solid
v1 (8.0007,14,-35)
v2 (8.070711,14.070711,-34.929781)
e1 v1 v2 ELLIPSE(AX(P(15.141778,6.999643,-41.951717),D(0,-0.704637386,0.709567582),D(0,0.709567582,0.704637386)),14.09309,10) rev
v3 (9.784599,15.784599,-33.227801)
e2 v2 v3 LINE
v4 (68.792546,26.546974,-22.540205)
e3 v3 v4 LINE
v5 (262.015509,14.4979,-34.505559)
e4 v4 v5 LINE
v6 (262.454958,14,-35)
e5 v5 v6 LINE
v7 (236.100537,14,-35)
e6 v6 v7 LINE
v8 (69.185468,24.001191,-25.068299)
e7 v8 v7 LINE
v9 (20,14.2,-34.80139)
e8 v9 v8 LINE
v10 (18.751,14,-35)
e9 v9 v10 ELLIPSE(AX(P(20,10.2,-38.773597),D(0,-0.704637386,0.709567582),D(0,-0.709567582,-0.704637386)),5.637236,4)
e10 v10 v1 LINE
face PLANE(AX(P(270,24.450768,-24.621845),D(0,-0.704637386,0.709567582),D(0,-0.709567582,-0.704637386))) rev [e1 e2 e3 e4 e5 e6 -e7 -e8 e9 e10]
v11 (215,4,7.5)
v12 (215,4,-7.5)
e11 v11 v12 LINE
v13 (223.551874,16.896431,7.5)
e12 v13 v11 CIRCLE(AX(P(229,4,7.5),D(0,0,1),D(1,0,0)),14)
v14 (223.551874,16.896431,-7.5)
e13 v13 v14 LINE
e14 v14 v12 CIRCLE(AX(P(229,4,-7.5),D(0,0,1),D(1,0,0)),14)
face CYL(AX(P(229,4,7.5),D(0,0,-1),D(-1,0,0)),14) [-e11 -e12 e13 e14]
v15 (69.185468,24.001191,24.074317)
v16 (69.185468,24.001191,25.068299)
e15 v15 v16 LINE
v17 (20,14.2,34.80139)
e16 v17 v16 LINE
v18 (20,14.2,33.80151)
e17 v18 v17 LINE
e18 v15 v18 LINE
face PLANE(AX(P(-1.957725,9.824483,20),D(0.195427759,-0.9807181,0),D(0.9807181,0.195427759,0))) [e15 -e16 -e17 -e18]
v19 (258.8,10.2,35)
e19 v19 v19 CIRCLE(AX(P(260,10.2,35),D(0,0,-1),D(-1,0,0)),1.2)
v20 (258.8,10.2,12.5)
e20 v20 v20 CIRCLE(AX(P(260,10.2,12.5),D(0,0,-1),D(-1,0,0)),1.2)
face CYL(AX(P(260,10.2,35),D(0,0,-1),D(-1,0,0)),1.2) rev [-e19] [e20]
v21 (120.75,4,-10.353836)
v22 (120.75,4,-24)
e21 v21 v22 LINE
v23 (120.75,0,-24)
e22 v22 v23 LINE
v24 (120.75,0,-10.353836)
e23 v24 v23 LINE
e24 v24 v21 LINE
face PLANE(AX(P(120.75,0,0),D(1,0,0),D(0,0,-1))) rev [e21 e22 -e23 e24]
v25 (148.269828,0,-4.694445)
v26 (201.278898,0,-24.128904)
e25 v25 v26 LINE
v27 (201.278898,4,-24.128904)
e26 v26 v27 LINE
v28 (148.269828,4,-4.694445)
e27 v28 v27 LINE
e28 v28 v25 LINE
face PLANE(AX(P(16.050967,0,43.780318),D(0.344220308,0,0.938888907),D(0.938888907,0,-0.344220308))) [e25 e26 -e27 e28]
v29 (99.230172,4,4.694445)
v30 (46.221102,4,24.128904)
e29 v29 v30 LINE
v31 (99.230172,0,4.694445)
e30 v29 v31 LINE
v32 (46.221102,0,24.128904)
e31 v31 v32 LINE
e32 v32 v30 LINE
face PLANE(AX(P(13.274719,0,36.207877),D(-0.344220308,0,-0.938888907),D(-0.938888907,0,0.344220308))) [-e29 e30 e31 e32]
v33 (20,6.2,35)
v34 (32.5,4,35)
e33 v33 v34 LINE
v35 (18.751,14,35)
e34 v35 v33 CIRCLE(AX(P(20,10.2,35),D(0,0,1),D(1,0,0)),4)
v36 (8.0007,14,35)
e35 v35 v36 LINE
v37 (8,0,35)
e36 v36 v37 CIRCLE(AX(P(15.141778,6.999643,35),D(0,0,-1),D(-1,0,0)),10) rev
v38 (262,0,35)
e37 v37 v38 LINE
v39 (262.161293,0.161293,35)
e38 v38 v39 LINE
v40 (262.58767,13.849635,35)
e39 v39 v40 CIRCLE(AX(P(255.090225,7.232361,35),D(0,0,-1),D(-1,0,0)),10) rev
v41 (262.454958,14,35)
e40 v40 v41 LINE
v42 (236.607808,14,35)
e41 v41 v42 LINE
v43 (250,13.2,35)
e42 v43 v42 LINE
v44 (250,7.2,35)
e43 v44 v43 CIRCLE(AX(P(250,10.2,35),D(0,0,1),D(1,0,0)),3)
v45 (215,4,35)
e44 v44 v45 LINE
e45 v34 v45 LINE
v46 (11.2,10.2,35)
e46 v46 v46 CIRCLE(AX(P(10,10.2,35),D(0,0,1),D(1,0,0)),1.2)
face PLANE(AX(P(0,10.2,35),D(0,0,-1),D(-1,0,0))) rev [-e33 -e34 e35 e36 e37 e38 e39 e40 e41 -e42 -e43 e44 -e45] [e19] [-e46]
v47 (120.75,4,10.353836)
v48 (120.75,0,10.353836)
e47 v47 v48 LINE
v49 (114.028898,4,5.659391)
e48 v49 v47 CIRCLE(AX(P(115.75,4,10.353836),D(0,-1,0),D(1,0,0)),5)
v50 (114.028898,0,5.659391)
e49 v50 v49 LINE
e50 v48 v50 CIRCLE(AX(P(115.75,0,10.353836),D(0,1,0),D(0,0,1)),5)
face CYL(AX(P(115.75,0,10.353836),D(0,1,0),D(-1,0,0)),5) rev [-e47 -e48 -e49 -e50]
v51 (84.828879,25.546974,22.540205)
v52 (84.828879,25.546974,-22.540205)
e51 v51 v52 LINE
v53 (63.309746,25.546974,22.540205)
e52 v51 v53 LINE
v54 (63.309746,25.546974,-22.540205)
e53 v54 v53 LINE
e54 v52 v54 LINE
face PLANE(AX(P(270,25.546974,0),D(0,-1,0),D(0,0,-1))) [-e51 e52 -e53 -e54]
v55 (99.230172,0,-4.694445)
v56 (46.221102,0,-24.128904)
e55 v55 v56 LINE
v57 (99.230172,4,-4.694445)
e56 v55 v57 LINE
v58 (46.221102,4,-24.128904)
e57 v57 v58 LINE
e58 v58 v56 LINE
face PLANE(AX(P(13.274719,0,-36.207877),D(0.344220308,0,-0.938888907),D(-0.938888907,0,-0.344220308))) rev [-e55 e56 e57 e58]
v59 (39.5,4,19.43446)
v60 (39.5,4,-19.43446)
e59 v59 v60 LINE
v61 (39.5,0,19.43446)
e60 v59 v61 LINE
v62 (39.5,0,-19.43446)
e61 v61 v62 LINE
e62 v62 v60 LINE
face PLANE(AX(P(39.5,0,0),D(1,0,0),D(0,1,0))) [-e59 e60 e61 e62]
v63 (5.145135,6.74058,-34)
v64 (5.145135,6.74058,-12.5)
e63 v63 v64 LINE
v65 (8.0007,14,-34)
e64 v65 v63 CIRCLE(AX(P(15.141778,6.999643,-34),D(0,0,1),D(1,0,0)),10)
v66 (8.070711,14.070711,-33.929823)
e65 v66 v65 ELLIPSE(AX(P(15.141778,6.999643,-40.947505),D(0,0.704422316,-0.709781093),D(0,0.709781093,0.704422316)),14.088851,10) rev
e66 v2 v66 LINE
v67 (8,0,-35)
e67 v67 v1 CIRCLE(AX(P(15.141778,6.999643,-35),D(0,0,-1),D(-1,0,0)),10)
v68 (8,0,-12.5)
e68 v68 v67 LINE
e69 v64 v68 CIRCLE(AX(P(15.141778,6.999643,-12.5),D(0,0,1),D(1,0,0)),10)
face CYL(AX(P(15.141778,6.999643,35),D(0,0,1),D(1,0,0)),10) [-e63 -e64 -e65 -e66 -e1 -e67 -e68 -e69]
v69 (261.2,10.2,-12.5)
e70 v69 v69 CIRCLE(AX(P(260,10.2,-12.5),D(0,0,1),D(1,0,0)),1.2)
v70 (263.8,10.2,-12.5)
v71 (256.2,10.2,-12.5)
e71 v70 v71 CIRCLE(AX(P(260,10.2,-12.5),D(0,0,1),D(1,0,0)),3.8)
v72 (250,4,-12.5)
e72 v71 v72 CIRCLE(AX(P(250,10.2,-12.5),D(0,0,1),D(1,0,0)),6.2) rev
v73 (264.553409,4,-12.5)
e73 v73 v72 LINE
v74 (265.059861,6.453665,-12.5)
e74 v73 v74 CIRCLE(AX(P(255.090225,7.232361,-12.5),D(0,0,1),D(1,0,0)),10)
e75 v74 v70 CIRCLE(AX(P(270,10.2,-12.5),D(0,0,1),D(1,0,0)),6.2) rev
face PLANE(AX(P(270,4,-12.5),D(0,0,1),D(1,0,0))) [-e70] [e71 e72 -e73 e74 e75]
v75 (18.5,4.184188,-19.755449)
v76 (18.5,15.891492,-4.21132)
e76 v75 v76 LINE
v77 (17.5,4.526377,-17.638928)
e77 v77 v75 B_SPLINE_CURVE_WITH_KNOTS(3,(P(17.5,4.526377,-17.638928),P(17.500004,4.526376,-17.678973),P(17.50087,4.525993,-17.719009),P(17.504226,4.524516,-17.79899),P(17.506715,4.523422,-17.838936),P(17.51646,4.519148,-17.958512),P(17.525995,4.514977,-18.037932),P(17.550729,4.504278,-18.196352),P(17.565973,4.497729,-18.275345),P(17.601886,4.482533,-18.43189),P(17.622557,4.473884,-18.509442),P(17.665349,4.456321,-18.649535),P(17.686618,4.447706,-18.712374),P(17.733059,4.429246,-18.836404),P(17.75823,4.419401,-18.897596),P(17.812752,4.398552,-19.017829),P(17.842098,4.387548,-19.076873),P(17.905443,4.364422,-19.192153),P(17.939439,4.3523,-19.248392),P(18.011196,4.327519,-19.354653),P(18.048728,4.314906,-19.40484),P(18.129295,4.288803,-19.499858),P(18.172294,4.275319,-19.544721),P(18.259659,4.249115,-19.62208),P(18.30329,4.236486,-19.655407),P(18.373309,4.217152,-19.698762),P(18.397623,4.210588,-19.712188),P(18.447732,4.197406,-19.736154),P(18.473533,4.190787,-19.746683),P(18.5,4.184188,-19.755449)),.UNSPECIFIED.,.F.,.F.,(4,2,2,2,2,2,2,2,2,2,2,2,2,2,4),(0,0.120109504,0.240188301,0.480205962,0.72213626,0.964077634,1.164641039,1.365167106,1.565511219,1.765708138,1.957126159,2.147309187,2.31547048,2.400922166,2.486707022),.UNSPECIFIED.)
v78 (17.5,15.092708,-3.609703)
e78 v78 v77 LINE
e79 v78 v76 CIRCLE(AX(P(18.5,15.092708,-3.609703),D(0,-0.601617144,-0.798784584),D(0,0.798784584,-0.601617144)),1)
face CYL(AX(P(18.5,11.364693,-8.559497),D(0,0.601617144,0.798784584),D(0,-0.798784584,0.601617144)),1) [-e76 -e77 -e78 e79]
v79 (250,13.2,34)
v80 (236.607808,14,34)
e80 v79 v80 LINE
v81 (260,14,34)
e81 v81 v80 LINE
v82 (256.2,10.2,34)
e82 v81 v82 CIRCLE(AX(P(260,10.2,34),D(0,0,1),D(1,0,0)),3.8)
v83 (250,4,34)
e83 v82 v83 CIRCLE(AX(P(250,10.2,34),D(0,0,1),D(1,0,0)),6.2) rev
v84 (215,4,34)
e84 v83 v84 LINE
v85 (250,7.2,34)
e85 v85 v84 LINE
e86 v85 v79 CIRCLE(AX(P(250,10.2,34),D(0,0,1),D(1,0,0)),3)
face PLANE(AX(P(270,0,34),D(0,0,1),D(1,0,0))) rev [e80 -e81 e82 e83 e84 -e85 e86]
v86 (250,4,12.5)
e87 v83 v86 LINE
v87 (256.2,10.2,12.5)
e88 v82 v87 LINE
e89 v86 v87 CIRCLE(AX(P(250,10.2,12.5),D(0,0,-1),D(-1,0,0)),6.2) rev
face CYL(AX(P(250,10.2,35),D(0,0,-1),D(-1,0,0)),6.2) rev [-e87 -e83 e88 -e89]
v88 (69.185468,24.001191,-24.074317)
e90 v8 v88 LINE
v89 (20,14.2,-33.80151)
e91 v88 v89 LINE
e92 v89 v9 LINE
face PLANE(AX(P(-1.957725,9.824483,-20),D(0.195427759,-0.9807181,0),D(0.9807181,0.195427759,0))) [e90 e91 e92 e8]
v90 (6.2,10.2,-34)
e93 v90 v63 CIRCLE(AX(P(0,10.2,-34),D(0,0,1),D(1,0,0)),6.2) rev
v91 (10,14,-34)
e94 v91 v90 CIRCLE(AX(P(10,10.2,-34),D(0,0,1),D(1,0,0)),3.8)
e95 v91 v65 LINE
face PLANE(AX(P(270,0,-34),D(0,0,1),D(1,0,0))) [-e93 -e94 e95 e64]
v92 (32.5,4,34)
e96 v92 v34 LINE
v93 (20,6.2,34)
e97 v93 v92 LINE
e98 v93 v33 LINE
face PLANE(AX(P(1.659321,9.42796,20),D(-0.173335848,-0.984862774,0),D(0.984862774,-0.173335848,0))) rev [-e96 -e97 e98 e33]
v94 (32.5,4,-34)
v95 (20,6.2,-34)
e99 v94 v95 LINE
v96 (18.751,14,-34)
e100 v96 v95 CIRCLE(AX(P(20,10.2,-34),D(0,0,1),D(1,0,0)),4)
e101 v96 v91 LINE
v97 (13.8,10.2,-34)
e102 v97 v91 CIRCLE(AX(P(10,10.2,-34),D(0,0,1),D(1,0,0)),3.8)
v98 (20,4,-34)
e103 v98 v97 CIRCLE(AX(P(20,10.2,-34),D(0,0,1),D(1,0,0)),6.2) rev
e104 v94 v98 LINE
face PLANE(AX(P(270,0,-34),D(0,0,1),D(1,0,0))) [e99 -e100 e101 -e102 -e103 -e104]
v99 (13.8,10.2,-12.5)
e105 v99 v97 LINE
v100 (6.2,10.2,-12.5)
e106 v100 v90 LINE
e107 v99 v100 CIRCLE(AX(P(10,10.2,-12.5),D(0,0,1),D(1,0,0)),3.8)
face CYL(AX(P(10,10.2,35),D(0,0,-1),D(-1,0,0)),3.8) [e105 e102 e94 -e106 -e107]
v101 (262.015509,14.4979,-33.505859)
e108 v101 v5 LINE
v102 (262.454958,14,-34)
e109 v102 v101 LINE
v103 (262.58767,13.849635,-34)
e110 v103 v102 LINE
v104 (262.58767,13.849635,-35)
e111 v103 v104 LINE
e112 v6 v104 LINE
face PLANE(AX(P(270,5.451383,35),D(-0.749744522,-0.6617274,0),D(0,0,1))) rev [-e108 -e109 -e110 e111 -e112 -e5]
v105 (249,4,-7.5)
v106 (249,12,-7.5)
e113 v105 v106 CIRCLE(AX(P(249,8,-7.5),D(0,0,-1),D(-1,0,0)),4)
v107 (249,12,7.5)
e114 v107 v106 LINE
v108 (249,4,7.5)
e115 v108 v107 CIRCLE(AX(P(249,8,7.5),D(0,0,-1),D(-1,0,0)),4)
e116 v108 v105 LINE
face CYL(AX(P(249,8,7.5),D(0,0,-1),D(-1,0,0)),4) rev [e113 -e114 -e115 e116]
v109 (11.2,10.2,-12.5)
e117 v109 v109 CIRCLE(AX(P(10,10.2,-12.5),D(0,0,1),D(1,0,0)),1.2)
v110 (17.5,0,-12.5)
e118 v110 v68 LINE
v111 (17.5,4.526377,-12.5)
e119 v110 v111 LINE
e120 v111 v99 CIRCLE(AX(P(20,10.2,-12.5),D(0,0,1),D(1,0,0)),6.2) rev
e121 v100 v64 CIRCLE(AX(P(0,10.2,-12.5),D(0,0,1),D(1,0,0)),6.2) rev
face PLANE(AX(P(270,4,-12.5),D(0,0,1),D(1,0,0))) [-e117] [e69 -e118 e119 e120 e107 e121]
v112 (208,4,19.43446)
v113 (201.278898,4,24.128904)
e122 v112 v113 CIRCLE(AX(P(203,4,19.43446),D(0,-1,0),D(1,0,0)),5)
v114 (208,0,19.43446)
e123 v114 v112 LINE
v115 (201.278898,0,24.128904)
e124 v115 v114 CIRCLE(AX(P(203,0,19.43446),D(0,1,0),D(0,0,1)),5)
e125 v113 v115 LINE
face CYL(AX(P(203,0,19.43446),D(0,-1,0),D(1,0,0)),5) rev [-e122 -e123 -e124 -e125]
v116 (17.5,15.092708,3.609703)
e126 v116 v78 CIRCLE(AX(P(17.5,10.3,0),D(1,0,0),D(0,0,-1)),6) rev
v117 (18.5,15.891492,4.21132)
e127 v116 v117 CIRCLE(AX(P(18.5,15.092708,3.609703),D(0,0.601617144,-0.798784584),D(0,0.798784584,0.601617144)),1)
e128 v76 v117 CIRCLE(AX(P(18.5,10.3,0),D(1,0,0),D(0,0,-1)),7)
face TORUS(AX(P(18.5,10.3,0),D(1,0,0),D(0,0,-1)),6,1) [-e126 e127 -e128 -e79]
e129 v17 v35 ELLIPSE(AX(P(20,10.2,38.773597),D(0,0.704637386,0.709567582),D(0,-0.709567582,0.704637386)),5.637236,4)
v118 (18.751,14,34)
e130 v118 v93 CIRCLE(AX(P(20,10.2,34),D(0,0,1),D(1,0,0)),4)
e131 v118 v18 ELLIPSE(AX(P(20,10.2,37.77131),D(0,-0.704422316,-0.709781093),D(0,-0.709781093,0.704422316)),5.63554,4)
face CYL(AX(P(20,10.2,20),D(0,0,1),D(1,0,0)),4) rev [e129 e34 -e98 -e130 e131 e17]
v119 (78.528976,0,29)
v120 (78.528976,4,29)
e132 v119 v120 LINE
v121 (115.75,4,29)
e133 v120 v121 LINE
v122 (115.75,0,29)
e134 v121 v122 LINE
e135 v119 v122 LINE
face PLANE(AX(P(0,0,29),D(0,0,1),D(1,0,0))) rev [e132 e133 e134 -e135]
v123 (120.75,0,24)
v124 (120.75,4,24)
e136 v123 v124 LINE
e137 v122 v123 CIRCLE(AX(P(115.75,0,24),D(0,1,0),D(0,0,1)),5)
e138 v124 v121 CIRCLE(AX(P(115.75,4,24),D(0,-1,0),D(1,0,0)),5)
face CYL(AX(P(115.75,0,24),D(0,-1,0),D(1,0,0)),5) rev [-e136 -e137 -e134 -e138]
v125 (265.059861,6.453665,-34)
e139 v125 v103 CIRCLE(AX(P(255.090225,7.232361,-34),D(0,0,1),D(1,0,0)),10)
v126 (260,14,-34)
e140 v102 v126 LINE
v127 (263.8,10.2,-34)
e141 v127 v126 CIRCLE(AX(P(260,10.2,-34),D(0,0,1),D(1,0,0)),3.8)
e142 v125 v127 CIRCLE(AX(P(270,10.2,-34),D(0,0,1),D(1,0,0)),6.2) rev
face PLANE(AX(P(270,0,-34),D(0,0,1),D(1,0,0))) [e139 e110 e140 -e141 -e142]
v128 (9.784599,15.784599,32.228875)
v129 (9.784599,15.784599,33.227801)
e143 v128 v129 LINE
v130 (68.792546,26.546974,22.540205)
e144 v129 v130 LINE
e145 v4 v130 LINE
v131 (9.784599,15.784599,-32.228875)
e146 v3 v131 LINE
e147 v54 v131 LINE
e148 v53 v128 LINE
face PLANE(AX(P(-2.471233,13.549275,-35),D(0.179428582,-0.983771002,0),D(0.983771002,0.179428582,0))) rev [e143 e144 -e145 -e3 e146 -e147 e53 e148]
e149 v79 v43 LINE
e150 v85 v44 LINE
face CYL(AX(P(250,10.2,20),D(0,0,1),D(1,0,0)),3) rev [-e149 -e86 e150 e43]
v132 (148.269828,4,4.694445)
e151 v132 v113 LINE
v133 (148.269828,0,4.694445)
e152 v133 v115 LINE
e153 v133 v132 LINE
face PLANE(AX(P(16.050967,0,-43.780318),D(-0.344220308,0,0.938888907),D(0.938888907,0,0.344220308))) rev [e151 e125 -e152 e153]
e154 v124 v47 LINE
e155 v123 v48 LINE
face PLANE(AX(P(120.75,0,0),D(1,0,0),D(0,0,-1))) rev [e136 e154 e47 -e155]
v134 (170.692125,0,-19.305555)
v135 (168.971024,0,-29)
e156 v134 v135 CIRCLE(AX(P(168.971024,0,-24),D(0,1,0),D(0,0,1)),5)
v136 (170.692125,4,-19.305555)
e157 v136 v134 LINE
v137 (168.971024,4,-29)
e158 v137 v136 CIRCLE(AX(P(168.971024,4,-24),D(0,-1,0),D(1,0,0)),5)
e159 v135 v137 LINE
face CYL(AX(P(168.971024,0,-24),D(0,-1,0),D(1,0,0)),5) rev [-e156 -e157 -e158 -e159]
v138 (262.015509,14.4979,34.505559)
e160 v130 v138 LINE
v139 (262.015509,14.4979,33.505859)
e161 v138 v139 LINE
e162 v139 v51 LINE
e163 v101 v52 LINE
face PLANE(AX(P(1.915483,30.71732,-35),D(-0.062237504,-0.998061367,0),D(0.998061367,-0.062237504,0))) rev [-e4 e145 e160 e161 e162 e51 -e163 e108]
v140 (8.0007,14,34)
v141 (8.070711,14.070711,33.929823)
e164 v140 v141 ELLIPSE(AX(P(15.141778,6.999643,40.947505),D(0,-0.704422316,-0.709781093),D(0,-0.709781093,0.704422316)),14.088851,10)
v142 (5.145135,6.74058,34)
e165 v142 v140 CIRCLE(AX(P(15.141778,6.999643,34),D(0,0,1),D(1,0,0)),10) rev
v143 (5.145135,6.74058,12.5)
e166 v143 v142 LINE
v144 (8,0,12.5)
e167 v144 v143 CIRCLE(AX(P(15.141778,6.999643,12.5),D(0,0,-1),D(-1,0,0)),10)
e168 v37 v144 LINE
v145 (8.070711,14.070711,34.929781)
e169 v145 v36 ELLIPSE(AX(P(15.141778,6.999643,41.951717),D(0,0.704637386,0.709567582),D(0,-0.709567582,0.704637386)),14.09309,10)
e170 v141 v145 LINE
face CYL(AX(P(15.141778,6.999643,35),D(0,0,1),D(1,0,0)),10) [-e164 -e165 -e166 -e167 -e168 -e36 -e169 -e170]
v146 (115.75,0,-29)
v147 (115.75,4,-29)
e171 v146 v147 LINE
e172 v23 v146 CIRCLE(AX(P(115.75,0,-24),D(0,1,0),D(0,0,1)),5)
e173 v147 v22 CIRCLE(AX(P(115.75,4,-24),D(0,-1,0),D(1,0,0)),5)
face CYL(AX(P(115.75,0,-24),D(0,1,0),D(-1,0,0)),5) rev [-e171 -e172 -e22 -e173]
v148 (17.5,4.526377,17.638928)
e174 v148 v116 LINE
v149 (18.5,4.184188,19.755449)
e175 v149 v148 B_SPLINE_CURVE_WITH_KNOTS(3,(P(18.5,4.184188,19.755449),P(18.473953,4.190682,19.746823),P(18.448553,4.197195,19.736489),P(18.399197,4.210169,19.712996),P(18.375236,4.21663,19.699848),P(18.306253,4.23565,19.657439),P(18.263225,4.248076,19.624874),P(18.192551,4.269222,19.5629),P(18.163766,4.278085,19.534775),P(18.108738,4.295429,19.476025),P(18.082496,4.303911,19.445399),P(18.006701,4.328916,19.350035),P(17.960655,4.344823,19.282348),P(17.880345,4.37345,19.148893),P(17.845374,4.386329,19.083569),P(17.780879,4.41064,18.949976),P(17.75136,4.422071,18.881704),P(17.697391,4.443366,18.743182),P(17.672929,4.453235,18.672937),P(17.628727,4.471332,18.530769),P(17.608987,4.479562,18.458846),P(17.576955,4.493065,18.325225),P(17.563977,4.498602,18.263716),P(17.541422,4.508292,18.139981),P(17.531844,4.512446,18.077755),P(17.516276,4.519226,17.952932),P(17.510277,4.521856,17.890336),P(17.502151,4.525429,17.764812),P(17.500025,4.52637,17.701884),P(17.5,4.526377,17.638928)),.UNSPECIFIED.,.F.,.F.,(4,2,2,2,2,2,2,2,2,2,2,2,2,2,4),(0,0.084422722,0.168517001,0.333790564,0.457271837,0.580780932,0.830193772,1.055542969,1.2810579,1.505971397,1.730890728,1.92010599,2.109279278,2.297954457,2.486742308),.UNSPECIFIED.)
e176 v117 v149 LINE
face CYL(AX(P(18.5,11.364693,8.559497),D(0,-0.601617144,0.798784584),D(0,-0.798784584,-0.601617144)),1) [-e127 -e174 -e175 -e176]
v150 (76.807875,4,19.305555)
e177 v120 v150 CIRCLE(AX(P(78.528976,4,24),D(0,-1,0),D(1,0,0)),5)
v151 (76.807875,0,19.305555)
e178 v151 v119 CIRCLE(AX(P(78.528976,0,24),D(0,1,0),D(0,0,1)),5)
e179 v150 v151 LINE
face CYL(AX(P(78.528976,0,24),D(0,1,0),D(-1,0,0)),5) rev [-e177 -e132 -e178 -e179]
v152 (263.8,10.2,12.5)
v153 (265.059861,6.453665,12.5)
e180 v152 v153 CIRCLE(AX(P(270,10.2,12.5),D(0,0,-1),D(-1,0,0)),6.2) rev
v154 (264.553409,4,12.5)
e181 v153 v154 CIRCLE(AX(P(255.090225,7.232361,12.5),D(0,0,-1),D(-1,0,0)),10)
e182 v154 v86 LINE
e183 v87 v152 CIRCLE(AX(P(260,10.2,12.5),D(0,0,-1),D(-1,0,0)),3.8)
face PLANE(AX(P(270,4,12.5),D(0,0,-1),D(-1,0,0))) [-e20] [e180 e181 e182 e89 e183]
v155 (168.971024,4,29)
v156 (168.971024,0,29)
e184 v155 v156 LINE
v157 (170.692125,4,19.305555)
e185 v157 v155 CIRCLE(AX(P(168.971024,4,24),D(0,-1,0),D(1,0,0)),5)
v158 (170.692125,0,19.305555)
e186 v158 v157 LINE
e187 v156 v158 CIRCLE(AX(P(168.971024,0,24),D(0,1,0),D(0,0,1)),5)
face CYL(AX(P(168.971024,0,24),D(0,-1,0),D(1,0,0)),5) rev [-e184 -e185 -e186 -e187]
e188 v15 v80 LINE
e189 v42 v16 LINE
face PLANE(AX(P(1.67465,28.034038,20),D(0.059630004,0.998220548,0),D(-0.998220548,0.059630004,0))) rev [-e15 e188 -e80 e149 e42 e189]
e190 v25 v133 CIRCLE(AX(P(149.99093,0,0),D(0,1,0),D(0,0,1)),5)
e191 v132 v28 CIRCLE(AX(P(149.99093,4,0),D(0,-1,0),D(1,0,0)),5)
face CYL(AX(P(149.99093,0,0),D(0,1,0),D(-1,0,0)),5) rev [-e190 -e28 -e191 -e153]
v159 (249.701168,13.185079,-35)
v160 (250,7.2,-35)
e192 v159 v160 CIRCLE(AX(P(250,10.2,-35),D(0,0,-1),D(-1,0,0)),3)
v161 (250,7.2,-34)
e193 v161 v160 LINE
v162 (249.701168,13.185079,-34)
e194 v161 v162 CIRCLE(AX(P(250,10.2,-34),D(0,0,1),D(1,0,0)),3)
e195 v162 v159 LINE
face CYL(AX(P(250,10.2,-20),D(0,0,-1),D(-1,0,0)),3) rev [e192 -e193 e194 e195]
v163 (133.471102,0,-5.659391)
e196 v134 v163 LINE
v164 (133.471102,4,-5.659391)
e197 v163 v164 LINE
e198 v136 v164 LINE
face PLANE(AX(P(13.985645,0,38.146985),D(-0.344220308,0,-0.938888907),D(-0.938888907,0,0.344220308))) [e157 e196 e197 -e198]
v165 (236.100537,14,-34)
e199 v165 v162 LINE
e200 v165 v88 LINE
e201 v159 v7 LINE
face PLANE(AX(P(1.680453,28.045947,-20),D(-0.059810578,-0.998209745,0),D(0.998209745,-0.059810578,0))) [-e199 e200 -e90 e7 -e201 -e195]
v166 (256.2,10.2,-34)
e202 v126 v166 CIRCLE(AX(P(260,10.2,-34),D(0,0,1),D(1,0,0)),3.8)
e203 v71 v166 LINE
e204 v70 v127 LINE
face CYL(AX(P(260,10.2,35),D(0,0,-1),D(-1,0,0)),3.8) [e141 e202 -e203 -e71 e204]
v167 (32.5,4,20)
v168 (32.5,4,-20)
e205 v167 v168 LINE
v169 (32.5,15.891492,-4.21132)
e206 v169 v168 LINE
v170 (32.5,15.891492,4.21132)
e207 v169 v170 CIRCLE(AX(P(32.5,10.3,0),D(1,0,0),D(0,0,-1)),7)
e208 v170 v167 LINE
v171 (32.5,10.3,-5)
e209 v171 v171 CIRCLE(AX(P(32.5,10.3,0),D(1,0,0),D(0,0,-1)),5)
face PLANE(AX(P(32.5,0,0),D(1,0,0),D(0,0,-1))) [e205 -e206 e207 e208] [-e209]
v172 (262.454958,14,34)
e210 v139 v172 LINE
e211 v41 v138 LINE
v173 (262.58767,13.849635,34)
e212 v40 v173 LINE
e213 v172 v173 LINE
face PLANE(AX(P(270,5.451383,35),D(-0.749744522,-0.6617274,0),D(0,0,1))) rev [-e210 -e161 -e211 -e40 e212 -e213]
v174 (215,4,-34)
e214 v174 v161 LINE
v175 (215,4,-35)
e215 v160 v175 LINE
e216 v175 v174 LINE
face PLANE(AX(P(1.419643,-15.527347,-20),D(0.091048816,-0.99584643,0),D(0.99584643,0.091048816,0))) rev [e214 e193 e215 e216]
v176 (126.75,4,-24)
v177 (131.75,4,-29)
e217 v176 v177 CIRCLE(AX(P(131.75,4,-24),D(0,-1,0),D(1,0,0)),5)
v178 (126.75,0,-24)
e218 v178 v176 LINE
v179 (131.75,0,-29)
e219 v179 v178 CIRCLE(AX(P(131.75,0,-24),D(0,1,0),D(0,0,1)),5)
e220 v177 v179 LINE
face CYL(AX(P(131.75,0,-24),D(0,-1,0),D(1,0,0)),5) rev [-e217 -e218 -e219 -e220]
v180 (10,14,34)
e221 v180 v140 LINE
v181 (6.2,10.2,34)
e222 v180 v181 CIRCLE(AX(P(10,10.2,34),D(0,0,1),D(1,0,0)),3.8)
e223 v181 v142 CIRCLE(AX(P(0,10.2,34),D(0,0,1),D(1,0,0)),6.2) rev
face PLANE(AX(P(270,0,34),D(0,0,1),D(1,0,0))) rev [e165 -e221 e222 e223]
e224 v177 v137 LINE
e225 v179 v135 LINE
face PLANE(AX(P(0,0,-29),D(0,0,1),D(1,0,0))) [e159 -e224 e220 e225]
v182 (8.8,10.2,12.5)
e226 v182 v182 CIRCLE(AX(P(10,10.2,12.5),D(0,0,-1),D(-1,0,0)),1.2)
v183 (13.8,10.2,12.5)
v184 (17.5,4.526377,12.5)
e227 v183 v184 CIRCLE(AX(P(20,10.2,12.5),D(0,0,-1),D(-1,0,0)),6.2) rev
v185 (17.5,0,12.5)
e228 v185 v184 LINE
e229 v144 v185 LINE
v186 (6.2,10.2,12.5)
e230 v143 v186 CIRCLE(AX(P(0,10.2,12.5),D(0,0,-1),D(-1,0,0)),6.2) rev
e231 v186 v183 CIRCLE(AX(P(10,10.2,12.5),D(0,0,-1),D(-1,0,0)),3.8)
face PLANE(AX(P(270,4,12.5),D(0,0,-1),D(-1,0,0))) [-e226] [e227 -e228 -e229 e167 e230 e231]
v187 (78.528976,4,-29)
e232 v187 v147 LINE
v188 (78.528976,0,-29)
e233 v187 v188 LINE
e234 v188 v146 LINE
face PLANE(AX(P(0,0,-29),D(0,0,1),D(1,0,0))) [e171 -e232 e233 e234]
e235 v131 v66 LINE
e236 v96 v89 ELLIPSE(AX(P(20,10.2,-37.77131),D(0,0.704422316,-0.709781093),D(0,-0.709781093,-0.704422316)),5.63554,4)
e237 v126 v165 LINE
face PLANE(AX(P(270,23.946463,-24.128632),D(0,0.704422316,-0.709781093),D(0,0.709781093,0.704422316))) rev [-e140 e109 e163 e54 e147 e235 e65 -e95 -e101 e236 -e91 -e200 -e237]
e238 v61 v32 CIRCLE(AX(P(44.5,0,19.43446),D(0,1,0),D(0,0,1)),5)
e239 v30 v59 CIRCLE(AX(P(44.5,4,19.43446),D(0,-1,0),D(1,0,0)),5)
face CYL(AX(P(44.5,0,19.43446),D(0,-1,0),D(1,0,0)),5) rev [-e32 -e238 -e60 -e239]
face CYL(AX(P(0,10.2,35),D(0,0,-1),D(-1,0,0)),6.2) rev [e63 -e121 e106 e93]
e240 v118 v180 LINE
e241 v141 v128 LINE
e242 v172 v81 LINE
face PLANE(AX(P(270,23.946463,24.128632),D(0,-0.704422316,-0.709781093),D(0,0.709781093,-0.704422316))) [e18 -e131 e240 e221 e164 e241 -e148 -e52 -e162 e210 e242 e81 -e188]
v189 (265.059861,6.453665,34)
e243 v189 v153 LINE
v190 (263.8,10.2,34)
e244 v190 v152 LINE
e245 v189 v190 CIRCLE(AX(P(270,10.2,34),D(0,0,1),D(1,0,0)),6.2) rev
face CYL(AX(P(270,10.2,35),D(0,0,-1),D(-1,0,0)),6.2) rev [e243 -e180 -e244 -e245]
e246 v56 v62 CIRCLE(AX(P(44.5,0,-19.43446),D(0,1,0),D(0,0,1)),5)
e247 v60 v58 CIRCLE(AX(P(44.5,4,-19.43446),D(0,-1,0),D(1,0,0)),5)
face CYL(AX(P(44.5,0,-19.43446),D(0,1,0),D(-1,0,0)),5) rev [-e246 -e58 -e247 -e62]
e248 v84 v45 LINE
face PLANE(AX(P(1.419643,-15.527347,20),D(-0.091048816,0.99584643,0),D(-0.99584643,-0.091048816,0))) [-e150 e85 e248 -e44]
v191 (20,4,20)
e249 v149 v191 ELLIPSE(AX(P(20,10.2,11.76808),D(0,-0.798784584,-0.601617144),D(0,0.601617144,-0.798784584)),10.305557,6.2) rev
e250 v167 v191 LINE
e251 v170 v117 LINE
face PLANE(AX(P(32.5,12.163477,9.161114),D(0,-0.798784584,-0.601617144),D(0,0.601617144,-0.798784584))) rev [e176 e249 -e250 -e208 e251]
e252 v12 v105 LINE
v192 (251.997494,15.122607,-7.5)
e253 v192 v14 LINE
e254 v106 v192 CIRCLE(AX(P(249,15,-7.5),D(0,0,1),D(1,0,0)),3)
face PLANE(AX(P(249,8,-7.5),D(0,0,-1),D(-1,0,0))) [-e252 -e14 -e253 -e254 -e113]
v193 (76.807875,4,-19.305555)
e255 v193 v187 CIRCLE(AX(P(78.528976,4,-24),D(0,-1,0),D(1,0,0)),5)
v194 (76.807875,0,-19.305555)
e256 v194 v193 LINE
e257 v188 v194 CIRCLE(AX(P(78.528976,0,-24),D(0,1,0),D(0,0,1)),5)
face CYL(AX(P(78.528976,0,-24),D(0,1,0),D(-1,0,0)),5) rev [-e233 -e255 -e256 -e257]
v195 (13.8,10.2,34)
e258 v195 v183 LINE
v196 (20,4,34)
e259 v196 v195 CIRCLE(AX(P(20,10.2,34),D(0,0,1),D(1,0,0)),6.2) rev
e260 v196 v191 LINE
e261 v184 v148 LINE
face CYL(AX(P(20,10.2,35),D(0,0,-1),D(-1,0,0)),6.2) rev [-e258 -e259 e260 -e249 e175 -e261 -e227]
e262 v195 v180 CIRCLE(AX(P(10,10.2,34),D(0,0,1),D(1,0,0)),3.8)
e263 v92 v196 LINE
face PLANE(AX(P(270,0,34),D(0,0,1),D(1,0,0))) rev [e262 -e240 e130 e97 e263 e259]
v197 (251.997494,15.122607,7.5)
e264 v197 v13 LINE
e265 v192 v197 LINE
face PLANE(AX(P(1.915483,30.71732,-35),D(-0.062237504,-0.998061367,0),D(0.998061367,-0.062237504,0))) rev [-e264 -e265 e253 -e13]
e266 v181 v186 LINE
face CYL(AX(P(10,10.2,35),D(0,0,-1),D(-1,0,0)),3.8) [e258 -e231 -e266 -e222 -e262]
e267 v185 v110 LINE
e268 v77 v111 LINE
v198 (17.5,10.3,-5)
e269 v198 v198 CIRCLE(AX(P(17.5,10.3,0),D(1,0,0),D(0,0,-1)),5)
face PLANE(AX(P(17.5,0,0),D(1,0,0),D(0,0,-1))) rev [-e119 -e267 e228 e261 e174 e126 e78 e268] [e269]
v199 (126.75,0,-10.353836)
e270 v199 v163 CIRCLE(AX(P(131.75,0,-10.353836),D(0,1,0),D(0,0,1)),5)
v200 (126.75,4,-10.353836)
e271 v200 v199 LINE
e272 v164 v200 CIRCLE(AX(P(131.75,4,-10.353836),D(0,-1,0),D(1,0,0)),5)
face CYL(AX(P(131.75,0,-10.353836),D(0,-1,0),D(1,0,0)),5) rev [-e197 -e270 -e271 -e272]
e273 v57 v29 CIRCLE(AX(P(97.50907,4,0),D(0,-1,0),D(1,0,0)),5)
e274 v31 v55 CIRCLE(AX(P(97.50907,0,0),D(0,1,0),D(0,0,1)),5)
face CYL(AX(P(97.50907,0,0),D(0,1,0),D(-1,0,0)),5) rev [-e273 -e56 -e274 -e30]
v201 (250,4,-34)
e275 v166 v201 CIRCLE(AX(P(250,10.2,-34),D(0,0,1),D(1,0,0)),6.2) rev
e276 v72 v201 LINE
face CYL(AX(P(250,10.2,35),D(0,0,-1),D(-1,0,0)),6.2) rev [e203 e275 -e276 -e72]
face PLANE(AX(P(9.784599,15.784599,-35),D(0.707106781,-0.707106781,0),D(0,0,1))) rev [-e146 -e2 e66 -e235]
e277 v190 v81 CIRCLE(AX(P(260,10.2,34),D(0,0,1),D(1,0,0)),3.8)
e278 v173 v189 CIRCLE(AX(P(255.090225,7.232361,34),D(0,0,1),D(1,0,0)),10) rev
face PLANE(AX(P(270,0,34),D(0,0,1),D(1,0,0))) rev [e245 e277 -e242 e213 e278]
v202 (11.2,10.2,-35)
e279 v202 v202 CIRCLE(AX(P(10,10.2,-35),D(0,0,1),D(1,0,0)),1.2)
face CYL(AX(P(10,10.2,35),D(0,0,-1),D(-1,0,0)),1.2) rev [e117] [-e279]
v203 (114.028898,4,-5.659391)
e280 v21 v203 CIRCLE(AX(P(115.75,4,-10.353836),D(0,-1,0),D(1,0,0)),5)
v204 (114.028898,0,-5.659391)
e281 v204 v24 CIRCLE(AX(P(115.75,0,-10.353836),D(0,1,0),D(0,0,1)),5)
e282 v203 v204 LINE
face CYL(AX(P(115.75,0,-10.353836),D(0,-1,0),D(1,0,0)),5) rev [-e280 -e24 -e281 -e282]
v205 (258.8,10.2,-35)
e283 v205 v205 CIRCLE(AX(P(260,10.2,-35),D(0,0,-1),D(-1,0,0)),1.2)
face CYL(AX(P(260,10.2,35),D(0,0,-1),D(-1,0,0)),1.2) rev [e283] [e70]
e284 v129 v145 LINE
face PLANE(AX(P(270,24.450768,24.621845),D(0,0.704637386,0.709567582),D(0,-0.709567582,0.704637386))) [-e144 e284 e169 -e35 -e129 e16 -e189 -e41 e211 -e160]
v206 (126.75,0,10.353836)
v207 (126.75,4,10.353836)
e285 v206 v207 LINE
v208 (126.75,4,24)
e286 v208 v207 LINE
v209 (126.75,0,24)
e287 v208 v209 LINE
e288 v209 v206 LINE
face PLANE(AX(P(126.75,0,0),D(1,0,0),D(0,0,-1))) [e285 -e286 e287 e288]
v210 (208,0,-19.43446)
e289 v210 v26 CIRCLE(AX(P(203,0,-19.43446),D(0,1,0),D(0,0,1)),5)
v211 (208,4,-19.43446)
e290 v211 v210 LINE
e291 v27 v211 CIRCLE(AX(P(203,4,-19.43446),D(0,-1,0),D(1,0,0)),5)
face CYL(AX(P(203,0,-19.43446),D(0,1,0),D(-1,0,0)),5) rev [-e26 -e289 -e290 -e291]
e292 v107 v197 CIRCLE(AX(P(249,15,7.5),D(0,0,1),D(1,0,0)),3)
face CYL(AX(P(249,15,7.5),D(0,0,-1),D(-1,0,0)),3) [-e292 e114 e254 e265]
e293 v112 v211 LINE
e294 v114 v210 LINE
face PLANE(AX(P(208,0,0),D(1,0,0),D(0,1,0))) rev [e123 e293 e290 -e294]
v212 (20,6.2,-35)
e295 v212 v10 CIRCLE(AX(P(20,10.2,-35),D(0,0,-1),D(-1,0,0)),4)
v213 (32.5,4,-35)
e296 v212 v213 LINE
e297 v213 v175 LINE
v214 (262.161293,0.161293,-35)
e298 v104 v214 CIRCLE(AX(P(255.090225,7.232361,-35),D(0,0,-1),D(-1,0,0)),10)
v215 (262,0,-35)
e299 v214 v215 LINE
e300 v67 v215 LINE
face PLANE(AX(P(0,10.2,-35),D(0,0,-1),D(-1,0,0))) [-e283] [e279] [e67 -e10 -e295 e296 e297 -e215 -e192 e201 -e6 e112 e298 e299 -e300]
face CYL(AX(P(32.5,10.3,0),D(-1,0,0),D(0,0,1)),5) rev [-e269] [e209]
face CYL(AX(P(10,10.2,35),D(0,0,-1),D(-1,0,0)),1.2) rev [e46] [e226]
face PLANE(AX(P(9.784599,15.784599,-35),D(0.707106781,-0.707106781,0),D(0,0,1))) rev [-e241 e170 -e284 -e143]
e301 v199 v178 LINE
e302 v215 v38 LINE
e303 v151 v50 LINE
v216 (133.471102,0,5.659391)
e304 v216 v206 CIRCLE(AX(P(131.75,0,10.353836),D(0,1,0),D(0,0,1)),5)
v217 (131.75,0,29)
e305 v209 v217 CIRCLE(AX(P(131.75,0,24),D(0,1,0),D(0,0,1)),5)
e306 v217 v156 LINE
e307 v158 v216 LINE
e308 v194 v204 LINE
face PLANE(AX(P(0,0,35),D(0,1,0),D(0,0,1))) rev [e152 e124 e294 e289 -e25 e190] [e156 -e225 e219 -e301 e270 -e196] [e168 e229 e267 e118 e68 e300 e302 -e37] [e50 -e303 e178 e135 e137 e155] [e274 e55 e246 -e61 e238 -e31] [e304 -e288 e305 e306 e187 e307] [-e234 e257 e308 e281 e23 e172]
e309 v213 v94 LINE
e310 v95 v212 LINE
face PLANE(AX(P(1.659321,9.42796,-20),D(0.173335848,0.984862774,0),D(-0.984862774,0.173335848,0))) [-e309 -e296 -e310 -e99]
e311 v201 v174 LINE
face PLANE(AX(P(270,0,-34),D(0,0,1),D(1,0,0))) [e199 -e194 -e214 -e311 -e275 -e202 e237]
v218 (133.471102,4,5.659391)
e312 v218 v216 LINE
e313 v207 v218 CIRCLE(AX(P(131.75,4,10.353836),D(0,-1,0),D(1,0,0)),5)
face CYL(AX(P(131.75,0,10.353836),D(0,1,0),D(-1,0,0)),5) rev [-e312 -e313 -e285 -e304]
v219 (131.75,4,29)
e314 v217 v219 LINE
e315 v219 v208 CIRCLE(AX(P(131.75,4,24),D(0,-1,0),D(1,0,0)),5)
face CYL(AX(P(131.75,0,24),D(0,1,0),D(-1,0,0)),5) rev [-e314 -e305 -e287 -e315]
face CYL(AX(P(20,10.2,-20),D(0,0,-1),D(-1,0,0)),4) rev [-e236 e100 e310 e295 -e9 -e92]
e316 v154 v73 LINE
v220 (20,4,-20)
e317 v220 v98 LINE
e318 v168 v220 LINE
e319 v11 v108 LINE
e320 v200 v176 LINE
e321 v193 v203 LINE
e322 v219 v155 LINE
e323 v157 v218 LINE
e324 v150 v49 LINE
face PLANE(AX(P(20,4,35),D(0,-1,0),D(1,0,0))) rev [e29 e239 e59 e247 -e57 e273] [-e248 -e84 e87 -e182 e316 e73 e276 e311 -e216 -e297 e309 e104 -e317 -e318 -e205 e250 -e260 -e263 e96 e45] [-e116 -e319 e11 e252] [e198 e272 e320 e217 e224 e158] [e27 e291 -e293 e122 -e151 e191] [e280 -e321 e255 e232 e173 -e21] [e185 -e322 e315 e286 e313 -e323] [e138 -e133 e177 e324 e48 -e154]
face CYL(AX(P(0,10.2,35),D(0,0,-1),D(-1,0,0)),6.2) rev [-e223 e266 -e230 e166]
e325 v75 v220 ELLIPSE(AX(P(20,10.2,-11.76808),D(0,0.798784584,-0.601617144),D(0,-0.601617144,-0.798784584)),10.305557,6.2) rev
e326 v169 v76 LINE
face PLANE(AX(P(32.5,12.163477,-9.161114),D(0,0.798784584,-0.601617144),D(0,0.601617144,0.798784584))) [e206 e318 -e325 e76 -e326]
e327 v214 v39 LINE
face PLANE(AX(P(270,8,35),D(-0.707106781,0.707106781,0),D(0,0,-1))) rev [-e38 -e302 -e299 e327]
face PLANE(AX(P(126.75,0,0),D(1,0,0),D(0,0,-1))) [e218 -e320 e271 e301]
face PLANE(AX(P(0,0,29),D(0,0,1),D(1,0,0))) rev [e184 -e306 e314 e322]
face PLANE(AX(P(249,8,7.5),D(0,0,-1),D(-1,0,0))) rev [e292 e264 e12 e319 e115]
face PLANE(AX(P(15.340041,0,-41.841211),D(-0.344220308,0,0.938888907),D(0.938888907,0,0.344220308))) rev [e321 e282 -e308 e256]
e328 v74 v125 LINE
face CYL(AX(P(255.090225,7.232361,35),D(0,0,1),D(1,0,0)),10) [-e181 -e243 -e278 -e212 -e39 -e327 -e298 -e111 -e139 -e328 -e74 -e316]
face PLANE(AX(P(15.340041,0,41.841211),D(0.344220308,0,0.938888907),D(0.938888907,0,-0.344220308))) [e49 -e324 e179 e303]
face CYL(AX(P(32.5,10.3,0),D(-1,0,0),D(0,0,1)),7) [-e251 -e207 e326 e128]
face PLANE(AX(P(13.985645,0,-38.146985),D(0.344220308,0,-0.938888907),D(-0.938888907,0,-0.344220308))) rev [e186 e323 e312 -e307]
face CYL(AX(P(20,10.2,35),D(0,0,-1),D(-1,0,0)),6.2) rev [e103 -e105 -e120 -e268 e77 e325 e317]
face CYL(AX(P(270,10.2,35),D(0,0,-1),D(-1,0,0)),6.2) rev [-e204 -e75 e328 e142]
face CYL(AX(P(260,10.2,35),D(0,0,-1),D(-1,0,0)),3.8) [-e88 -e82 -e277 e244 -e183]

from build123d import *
from build123d.topology import SkipClean

# Parameters (mm, degrees)
SKETCH1_R                = 1.2
BOSS_EXTRUDE1_DEPTH      = 35
SKETCH2_W                = 25
SKETCH2_H                = 10
CUT_EXTRUDE1_DEPTH       = 273.618781451
BOSS_EXTRUDE2_DEPTH      = 7.5
SKETCH4_W                = 17.5
SKETCH4_H                = 25
CUT_EXTRUDE2_DEPTH       = 273.618781451
BOSS_EXTRUDE3_START      = 17.5
BOSS_EXTRUDE3_DEPTH      = 15
CUT_EXTRUDE7_DEPTH       = 273.618781451
FILLET8_R                = 5
FILLET9_R                = 1
BOSS_EXTRUDE4_DEPTH      = 270
CUT_EXTRUDE8_DEPTH       = 274.55025464
CUT_EXTRUDE8_DEPTH_BACK  = 274.55025464
CUT_EXTRUDE11_DEPTH      = 274.55025464
CUT_EXTRUDE11_DEPTH_BACK = 274.55025464
CUT_EXTRUDE9_DEPTH       = 276.428741807
CUT_EXTRUDE9_DEPTH_BACK  = 276.428741807
SKETCH19_R               = 1.2
CUT_EXTRUDE10_DEPTH      = 276.428741807
CUT_EXTRUDE10_DEPTH_BACK = 276.428741807
SKETCH21_R               = 1.2
CHAMFER1_SIZE            = 8
CHAMFER1_SIZE_2          = 9.946012797
CHAMFER1_SIZE_3          = 8.548617227
CHAMFER2_SIZE            = 8
CUT_EXTRUDE13_START      = -10.925683
CUT_EXTRUDE13_DEPTH      = 10.925683
CUT_EXTRUDE14_DEPTH      = 15
FILLET10_R               = 10


# Some blends are built 0.0001 mm under size
with BuildPart() as part:
    # Sketch1 → Boss-Extrude1 (new, symmetric)
    with BuildSketch(Plane.XY):
        with BuildLine():
            Line((0, 0), (270, 0))
            Line((270, 0), (270, 4))
            ThreePointArc((270, 4), (265.615937957, 5.815937957), (263.8, 10.2))
            ThreePointArc((263.8, 10.2), (260, 14), (256.2, 10.2))
            ThreePointArc((256.2, 10.2), (254.384062043, 5.815937957), (250, 4))
            Line((250, 4), (20, 4))
            ThreePointArc((20, 4), (15.615937957, 5.815937957), (13.8, 10.2))
            ThreePointArc((13.8, 10.2), (10, 14), (6.2, 10.2))
            ThreePointArc((6.2, 10.2), (4.384062043, 5.815937957), (0, 4))
            Line((0, 4), (0, 0))
        make_face()
        with Locations((10, 10.2)):
            Circle(SKETCH1_R, mode=Mode.SUBTRACT)
        with Locations((260, 10.2)):
            Circle(SKETCH1_R, mode=Mode.SUBTRACT)
    extrude(amount=BOSS_EXTRUDE1_DEPTH, both=True)

    # Sketch2 → Cut-Extrude1 (cut, through all)
    with BuildSketch(Plane(origin=(0, 0, 0), x_dir=(0, 0, -1), z_dir=(1, 0, 0))):
        with Locations((0, 9)):
            Rectangle(SKETCH2_W, SKETCH2_H)
    extrude(amount=CUT_EXTRUDE1_DEPTH, mode=Mode.SUBTRACT)

    # Sketch3 → Boss-Extrude2 (add, symmetric)
    with BuildSketch(Plane.XY):
        with BuildLine():
            Line((249, 18), (229, 18))
            ThreePointArc((229, 18), (219.100505063, 13.899494937), (215, 4))
            Line((215, 4), (249, 4))
            ThreePointArc((249, 4), (245, 8), (249, 12))
            ThreePointArc((249, 12), (252, 15), (249, 18))
        make_face()
    extrude(amount=BOSS_EXTRUDE2_DEPTH, both=True)

    # Sketch4 → Cut-Extrude2 (cut, through all)
    with BuildSketch(Plane(origin=(0, 4, 0), x_dir=(1, 0, 0), z_dir=(0, 1, 0))):
        with Locations((8.75, 0)):
            Rectangle(SKETCH4_W, SKETCH4_H)
    extrude(amount=-CUT_EXTRUDE2_DEPTH, mode=Mode.SUBTRACT)

    # Sketch6 → Boss-Extrude3 (add)
    with BuildSketch(Plane(origin=(0, 0, 0), x_dir=(0, 0, -1), z_dir=(1, 0, 0)).offset(BOSS_EXTRUDE3_START)):
        with BuildLine():
            Line((-15.013439976, 4), (-3.05122926, 4))
            ThreePointArc((-3.05122926, 4), (-5.860894332, 6.472478918), (-6.995136661, 10.039110964))
            Line((-6.995136661, 10.039110964), (-15.013439976, 4))
        make_face()
        with BuildLine():
            Line((-3.05122926, 4), (0, 4))
            Line((0, 4), (0, 5.3))
            ThreePointArc((0, 5.3), (-5, 10.3), (0, 15.3))
            Line((0, 15.3), (0, 17.3))
            ThreePointArc((0, 17.3), (-2.220310268, 16.938540677), (-4.211320008, 15.89149209))
            Line((-4.211320008, 15.89149209), (-20, 4))
            Line((-20, 4), (-15.013439976, 4))
            Line((-15.013439976, 4), (-6.995136661, 10.039110964))
            ThreePointArc((-6.995136661, 10.039110964), (-5.860894332, 6.472478918), (-3.05122926, 4))
        make_face()
        with BuildLine():
            Line((0, 5.3), (0, 4))
            Line((0, 4), (3.05122926, 4))
            ThreePointArc((3.05122926, 4), (5.860894332, 6.472478918), (6.995136661, 10.039110964))
            Line((6.995136661, 10.039110964), (15.013439976, 4))
            Line((15.013439976, 4), (20, 4))
            Line((20, 4), (4.211320008, 15.89149209))
            ThreePointArc((4.211320008, 15.89149209), (2.220310268, 16.938540677), (0, 17.3))
            Line((0, 17.3), (0, 15.3))
            ThreePointArc((0, 15.3), (3.535533906, 13.835533906), (5, 10.3))
            ThreePointArc((5, 10.3), (3.535533906, 6.764466094), (0, 5.3))
        make_face()
        with BuildLine():
            ThreePointArc((6.995136661, 10.039110964), (5.860894332, 6.472478918), (3.05122926, 4))
            Line((3.05122926, 4), (15.013439976, 4))
            Line((15.013439976, 4), (6.995136661, 10.039110964))
        make_face()
    extrude(amount=BOSS_EXTRUDE3_DEPTH)

    # Sketch12 → Cut-Extrude7 (cut, through all)
    with BuildSketch(Plane(origin=(0, 4, 0), x_dir=(1, 0, 0), z_dir=(0, 1, 0))):
        Polygon((50.365488341, -29), (120.75, -29), (120.75, -3.195266211), align=None)
        Polygon((39.5, -26.593029124), (112.034651346, 0), (39.5, 26.593029124), align=None)
        Polygon((120.75, 3.195266211), (120.75, 29), (50.365488341, 29), align=None)
        Polygon((126.75, 29), (126.75, 3.195266211), (197.134511659, 29), align=None)
        Polygon((135.465348654, 0), (208, -26.593029124), (208, 26.593029124), align=None)
        Polygon((126.75, -29), (197.134511659, -29), (126.75, -3.195266211), align=None)
    extrude(amount=-CUT_EXTRUDE7_DEPTH, mode=Mode.SUBTRACT)

    # Fillet8
    fillet8_edges = [part.edges().sort_by_distance(p)[0] for p in [
        (50.365488341, 2, -29),
        (120.75, 2, -29),
        (120.75, 2, -3.195266211),
        (39.5, 2, 26.593029124),
        (39.5, 2, -26.593029124),
        (112.034651346, 2, 0),
        (208, 2, 26.593029124),
        (135.465348654, 2, 0),
        (208, 2, -26.593029124),
        (126.75, 2, -29),
        (197.134511659, 2, -29),
        (126.75, 2, -3.195266211),
        (126.75, 2, 29),
        (126.75, 2, 3.195266211),
        (197.134511659, 2, 29),
        (50.365488341, 2, 29),
        (120.75, 2, 3.195266211),
        (120.75, 2, 29),
    ]]
    fillet(fillet8_edges, radius=FILLET8_R)

    # Fillet9
    fillet9_edges = [part.edges().sort_by_distance(p)[0] for p in [
        (17.5, 10.208934454, -11.756217096),
        (17.5, 10.208934454, 11.756217096),
        (17.5, 17.3, 0),
    ]]
    fillet(fillet9_edges, radius=FILLET9_R)

    # Sketch14 → Boss-Extrude4 (add, through all)
    with BuildSketch(Plane(origin=(0, 0, 0), x_dir=(0, 0, -1), z_dir=(1, 0, 0))):
        Polygon((-35, 14), (-35, 0), (-34, 0), (-34, 14), (-22.54020479, 25.546973716), (22.54020479, 25.546973716), (34, 14), (34, 0), (35, 0), (35, 14), (22.54020479, 26.546973716), (-22.54020479, 26.546973716), align=None)
    extrude(amount=BOSS_EXTRUDE4_DEPTH)

    # Sketch16 → Cut-Extrude8 (cut, two sides: drawn at the far end of the back side and taken through both)
    with BuildSketch(Plane.XY.offset(-CUT_EXTRUDE8_DEPTH_BACK)):
        Polygon((0, 26.546973716), (68.792545546, 26.546973716), (0, 14), align=None)
        Polygon((68.792545546, 26.546973716), (270, 14), (270, 26.546973716), align=None)
    extrude(amount=CUT_EXTRUDE8_DEPTH + CUT_EXTRUDE8_DEPTH_BACK, mode=Mode.SUBTRACT)

    # Sketch24 → Cut-Extrude11 (cut, two sides: drawn at the far end of the back side and taken through both)
    with BuildSketch(Plane.XY.offset(-CUT_EXTRUDE11_DEPTH_BACK)):
        with BuildLine():
            Line((32.5, 4), (32.5, 16))
            Line((32.5, 16), (69.185468124, 24.001191397))
            Line((69.185468124, 24.001191397), (218.863454759, 13.656627288))
            ThreePointArc((218.863454759, 13.656627288), (216.001699469, 9.200402226), (215, 4))
            Line((215, 4), (32.5, 4))
        make_face()
    extrude(amount=CUT_EXTRUDE11_DEPTH + CUT_EXTRUDE11_DEPTH_BACK, mode=Mode.SUBTRACT)

    # Sketch19 → Cut-Extrude9 (cut, two sides: drawn at the far end of the back side and taken through both)
    with SkipClean():  # the faces are left unmerged after this step: merging them gives an invalid solid
        with BuildSketch(Plane(origin=(0, 0, 12.5), x_dir=(-1, 0, 0), z_dir=(0, 0, -1)).offset(-CUT_EXTRUDE9_DEPTH_BACK)):
            with Locations((-260, 10.2)):
                Circle(SKETCH19_R)
        extrude(amount=CUT_EXTRUDE9_DEPTH + CUT_EXTRUDE9_DEPTH_BACK, mode=Mode.SUBTRACT)
    add(part.part.scale(1), mode=Mode.REPLACE)  # the faces are merged on a copy

    # Sketch21 → Cut-Extrude10 (cut, two sides: drawn at the far end of the back side and taken through both)
    with BuildSketch(Plane.XY.offset(-12.5).offset(-CUT_EXTRUDE10_DEPTH_BACK)):
        with Locations(Location((10, 10.2, 0), (0, 0, 180))):
            Circle(SKETCH21_R)
    extrude(amount=CUT_EXTRUDE10_DEPTH + CUT_EXTRUDE10_DEPTH_BACK, mode=Mode.SUBTRACT)

    # Chamfer1
    # the kernel refuses this chamfer: 9.946012797, 8.548617227, 8 mm, written as the material it takes off along each edge
    with BuildSketch(Plane(origin=(0, 14, -60.689326847), x_dir=(-0.03395034804691947, -0.9994235207695948, 0), z_dir=(0, 0, 1)), Plane(origin=(0, 14, 8.310673153), x_dir=(-0.03395034804691947, -0.9994235207695948, 0), z_dir=(0, 0, 1))) as chamfer1_piece_1:
        Polygon((CHAMFER1_SIZE * 0.99942352077, CHAMFER1_SIZE * 0.0339503480469), (-CHAMFER1_SIZE_2 * 0.212724513091, CHAMFER1_SIZE_2 * 0.977112215423), (0, 0), align=None)
    extrude(amount=52.378653694, mode=Mode.SUBTRACT)
    with BuildSketch(Plane(origin=(270, 0, -55.573463904), x_dir=(-0.9996219169112968, -0.027495876610586292, 0), z_dir=(0, 0, 1))) as chamfer1_piece_2:
        Polygon((CHAMFER1_SIZE * 0.999621916911, -CHAMFER1_SIZE * 0.0274958766106), (-CHAMFER1_SIZE * 0.0274958766106, -CHAMFER1_SIZE * 0.999621916911), (0, 0), align=None)
    extrude(amount=111.146927807, mode=Mode.SUBTRACT)
    with BuildSketch(Plane(origin=(270, 14, -57.019738367), x_dir=(0.025689924898951687, -0.9996699594159495, 0), z_dir=(0, 0, 1)), Plane(origin=(270, 14, 11.980261633), x_dir=(0.025689924898951687, -0.9996699594159495, 0), z_dir=(0, 0, 1))) as chamfer1_piece_3:
        Polygon((CHAMFER1_SIZE_3 * 0.99966995936, -CHAMFER1_SIZE_3 * 0.0256899248975), (-CHAMFER1_SIZE * 0.0878570846319, -CHAMFER1_SIZE * 0.996133089843), (0, 0), align=None)
    extrude(amount=45.039476735, mode=Mode.SUBTRACT)

    # Chamfer2
    # the kernel refuses this chamfer: 8 mm, written as the material it takes off along each edge
    with BuildSketch(Plane(origin=(0, 0, 8.073463904), x_dir=(0.9996219169112968, -0.02749587661058637, 0), z_dir=(0, 0, -1)), Plane(origin=(0, 0, 55.573463904), x_dir=(0.9996219169112968, -0.02749587661058637, 0), z_dir=(0, 0, -1))) as chamfer2_piece_1:
        Polygon((CHAMFER2_SIZE * 0.999621916911, -CHAMFER2_SIZE * 0.0274958766106), (-CHAMFER2_SIZE * 0.0274958766106, -CHAMFER2_SIZE * 0.999621916911), (0, 0), align=None)
    extrude(amount=63.646927807, mode=Mode.SUBTRACT)

    # Sketch25 → Cut-Extrude13 (cut)
    with BuildSketch(Plane.XY.offset(35).offset(CUT_EXTRUDE13_START)):
        with BuildLine():
            Line((69.185468124, 24.001191397), (20, 14.2))
            ThreePointArc((20, 14.2), (19.367544468, 14.149683532), (18.7510004, 14))
            Line((18.7510004, 14), (32.5, 14))
            Line((32.5, 14), (32.5, 4))
            Line((32.5, 4), (69.185468124, 24.001191397))
        make_face()
        with BuildLine():
            Line((32.5, 14), (18.7510004, 14))
            ThreePointArc((18.7510004, 14), (16.050316468, 9.567544468), (20, 6.2))
            Line((20, 6.2), (32.5, 4))
            Line((32.5, 4), (32.5, 14))
        make_face()
        with BuildLine():
            Line((236.607808325, 14), (69.185468124, 24.001191397))
            Line((69.185468124, 24.001191397), (215, 4))
            ThreePointArc((215, 4), (216.001699469, 9.200402226), (218.863454759, 13.656627288))
            Line((218.863454759, 13.656627288), (213.895112386, 14))
            Line((213.895112386, 14), (236.607808325, 14))
        make_face()
        with BuildLine():
            Line((250, 13.2), (236.607808325, 14))
            Line((236.607808325, 14), (213.895112386, 14))
            Line((213.895112386, 14), (218.863454759, 13.656627288))
            ThreePointArc((218.863454759, 13.656627288), (216.001699469, 9.200402226), (215, 4))
            Line((215, 4), (250, 7.2))
            ThreePointArc((250, 7.2), (253, 10.2), (250, 13.2))
        make_face()
    extrude(amount=CUT_EXTRUDE13_DEPTH, mode=Mode.SUBTRACT)

    # Sketch26 → Cut-Extrude14 (cut)
    with BuildSketch(Plane(origin=(0, 0, -35), x_dir=(-1, 0, 0), z_dir=(0, 0, -1))):
        with BuildLine():
            Line((-32.5, 14), (-32.5, 4))
            Line((-32.5, 4), (-20, 6.2))
            ThreePointArc((-20, 6.2), (-16.050316468, 9.567544468), (-18.7510004, 14))
            Line((-18.7510004, 14), (-32.5, 14))
        make_face()
        with BuildLine():
            Line((-20, 14.2), (-69.185468124, 24.001191397))
            Line((-69.185468124, 24.001191397), (-32.5, 4))
            Line((-32.5, 4), (-32.5, 14))
            Line((-32.5, 14), (-18.7510004, 14))
            ThreePointArc((-18.7510004, 14), (-19.367544468, 14.149683532), (-20, 14.2))
        make_face()
        with BuildLine():
            Line((-236.100536944, 14), (-249.701168083, 13.185079477))
            ThreePointArc((-249.701168083, 13.185079477), (-252.996267547, 10.349602086), (-250, 7.2))
            Line((-250, 7.2), (-215, 4))
            ThreePointArc((-215, 4), (-216.001699469, 9.200402226), (-218.863454759, 13.656627288))
            Line((-218.863454759, 13.656627288), (-213.895112386, 14))
            Line((-213.895112386, 14), (-236.100536944, 14))
        make_face()
        with BuildLine():
            Line((-69.185468124, 24.001191397), (-236.100536944, 14))
            Line((-236.100536944, 14), (-213.895112386, 14))
            Line((-213.895112386, 14), (-218.863454759, 13.656627288))
            ThreePointArc((-218.863454759, 13.656627288), (-216.001699469, 9.200402226), (-215, 4))
            Line((-215, 4), (-69.185468124, 24.001191397))
        make_face()
    extrude(amount=-CUT_EXTRUDE14_DEPTH, mode=Mode.SUBTRACT)

    # Fillet10
    fillet10_edges = [part.edges().sort_by_distance(p)[0] for p in [
        (268.805155225, 6.805155225, 34.5),
    ]]
    fillet(fillet10_edges, radius=FILLET10_R - 0.0001)  # a hair under: the kernel refuses the full size
    # the kernel refuses this fillet: 10 mm, written as the material it takes off along each edge
    with BuildSketch(Plane(origin=(1, 7, 60), x_dir=(0.707106781186265, -0.7071067811868301, 0), z_dir=(0, 0, -1))) as fillet10_2_piece_1:
        with BuildLine():
            CenterArc((FILLET10_R, -FILLET10_R), FILLET10_R, 90, 90)
            Line((0, -FILLET10_R), (-FILLET10_R * 0.0200000000005, -FILLET10_R))
            Line((-FILLET10_R * 0.0200000000005, -FILLET10_R), (-FILLET10_R * 0.02, FILLET10_R * 0.02))
            Line((-FILLET10_R * 0.02, FILLET10_R * 0.02), (FILLET10_R, FILLET10_R * 0.02))
            Line((FILLET10_R, FILLET10_R * 0.02), (FILLET10_R, 0))
        make_face()
    extrude(amount=51, mode=Mode.SUBTRACT)
    # the kernel refuses this fillet: 10 mm, written as the material it takes off along each edge
    with BuildSketch(Plane(origin=(1, 7, -9), x_dir=(0.707106781186265, -0.7071067811868301, 0), z_dir=(0, 0, -1))) as fillet10_3_piece_1:
        with BuildLine():
            CenterArc((FILLET10_R, -FILLET10_R), FILLET10_R, 90, 90)
            Line((0, -FILLET10_R), (-FILLET10_R * 0.0200000000005, -FILLET10_R))
            Line((-FILLET10_R * 0.0200000000005, -FILLET10_R), (-FILLET10_R * 0.02, FILLET10_R * 0.02))
            Line((-FILLET10_R * 0.02, FILLET10_R * 0.02), (FILLET10_R, FILLET10_R * 0.02))
            Line((FILLET10_R, FILLET10_R * 0.02), (FILLET10_R, 0))
        make_face()
    extrude(amount=51, mode=Mode.SUBTRACT)


solid = part.part
